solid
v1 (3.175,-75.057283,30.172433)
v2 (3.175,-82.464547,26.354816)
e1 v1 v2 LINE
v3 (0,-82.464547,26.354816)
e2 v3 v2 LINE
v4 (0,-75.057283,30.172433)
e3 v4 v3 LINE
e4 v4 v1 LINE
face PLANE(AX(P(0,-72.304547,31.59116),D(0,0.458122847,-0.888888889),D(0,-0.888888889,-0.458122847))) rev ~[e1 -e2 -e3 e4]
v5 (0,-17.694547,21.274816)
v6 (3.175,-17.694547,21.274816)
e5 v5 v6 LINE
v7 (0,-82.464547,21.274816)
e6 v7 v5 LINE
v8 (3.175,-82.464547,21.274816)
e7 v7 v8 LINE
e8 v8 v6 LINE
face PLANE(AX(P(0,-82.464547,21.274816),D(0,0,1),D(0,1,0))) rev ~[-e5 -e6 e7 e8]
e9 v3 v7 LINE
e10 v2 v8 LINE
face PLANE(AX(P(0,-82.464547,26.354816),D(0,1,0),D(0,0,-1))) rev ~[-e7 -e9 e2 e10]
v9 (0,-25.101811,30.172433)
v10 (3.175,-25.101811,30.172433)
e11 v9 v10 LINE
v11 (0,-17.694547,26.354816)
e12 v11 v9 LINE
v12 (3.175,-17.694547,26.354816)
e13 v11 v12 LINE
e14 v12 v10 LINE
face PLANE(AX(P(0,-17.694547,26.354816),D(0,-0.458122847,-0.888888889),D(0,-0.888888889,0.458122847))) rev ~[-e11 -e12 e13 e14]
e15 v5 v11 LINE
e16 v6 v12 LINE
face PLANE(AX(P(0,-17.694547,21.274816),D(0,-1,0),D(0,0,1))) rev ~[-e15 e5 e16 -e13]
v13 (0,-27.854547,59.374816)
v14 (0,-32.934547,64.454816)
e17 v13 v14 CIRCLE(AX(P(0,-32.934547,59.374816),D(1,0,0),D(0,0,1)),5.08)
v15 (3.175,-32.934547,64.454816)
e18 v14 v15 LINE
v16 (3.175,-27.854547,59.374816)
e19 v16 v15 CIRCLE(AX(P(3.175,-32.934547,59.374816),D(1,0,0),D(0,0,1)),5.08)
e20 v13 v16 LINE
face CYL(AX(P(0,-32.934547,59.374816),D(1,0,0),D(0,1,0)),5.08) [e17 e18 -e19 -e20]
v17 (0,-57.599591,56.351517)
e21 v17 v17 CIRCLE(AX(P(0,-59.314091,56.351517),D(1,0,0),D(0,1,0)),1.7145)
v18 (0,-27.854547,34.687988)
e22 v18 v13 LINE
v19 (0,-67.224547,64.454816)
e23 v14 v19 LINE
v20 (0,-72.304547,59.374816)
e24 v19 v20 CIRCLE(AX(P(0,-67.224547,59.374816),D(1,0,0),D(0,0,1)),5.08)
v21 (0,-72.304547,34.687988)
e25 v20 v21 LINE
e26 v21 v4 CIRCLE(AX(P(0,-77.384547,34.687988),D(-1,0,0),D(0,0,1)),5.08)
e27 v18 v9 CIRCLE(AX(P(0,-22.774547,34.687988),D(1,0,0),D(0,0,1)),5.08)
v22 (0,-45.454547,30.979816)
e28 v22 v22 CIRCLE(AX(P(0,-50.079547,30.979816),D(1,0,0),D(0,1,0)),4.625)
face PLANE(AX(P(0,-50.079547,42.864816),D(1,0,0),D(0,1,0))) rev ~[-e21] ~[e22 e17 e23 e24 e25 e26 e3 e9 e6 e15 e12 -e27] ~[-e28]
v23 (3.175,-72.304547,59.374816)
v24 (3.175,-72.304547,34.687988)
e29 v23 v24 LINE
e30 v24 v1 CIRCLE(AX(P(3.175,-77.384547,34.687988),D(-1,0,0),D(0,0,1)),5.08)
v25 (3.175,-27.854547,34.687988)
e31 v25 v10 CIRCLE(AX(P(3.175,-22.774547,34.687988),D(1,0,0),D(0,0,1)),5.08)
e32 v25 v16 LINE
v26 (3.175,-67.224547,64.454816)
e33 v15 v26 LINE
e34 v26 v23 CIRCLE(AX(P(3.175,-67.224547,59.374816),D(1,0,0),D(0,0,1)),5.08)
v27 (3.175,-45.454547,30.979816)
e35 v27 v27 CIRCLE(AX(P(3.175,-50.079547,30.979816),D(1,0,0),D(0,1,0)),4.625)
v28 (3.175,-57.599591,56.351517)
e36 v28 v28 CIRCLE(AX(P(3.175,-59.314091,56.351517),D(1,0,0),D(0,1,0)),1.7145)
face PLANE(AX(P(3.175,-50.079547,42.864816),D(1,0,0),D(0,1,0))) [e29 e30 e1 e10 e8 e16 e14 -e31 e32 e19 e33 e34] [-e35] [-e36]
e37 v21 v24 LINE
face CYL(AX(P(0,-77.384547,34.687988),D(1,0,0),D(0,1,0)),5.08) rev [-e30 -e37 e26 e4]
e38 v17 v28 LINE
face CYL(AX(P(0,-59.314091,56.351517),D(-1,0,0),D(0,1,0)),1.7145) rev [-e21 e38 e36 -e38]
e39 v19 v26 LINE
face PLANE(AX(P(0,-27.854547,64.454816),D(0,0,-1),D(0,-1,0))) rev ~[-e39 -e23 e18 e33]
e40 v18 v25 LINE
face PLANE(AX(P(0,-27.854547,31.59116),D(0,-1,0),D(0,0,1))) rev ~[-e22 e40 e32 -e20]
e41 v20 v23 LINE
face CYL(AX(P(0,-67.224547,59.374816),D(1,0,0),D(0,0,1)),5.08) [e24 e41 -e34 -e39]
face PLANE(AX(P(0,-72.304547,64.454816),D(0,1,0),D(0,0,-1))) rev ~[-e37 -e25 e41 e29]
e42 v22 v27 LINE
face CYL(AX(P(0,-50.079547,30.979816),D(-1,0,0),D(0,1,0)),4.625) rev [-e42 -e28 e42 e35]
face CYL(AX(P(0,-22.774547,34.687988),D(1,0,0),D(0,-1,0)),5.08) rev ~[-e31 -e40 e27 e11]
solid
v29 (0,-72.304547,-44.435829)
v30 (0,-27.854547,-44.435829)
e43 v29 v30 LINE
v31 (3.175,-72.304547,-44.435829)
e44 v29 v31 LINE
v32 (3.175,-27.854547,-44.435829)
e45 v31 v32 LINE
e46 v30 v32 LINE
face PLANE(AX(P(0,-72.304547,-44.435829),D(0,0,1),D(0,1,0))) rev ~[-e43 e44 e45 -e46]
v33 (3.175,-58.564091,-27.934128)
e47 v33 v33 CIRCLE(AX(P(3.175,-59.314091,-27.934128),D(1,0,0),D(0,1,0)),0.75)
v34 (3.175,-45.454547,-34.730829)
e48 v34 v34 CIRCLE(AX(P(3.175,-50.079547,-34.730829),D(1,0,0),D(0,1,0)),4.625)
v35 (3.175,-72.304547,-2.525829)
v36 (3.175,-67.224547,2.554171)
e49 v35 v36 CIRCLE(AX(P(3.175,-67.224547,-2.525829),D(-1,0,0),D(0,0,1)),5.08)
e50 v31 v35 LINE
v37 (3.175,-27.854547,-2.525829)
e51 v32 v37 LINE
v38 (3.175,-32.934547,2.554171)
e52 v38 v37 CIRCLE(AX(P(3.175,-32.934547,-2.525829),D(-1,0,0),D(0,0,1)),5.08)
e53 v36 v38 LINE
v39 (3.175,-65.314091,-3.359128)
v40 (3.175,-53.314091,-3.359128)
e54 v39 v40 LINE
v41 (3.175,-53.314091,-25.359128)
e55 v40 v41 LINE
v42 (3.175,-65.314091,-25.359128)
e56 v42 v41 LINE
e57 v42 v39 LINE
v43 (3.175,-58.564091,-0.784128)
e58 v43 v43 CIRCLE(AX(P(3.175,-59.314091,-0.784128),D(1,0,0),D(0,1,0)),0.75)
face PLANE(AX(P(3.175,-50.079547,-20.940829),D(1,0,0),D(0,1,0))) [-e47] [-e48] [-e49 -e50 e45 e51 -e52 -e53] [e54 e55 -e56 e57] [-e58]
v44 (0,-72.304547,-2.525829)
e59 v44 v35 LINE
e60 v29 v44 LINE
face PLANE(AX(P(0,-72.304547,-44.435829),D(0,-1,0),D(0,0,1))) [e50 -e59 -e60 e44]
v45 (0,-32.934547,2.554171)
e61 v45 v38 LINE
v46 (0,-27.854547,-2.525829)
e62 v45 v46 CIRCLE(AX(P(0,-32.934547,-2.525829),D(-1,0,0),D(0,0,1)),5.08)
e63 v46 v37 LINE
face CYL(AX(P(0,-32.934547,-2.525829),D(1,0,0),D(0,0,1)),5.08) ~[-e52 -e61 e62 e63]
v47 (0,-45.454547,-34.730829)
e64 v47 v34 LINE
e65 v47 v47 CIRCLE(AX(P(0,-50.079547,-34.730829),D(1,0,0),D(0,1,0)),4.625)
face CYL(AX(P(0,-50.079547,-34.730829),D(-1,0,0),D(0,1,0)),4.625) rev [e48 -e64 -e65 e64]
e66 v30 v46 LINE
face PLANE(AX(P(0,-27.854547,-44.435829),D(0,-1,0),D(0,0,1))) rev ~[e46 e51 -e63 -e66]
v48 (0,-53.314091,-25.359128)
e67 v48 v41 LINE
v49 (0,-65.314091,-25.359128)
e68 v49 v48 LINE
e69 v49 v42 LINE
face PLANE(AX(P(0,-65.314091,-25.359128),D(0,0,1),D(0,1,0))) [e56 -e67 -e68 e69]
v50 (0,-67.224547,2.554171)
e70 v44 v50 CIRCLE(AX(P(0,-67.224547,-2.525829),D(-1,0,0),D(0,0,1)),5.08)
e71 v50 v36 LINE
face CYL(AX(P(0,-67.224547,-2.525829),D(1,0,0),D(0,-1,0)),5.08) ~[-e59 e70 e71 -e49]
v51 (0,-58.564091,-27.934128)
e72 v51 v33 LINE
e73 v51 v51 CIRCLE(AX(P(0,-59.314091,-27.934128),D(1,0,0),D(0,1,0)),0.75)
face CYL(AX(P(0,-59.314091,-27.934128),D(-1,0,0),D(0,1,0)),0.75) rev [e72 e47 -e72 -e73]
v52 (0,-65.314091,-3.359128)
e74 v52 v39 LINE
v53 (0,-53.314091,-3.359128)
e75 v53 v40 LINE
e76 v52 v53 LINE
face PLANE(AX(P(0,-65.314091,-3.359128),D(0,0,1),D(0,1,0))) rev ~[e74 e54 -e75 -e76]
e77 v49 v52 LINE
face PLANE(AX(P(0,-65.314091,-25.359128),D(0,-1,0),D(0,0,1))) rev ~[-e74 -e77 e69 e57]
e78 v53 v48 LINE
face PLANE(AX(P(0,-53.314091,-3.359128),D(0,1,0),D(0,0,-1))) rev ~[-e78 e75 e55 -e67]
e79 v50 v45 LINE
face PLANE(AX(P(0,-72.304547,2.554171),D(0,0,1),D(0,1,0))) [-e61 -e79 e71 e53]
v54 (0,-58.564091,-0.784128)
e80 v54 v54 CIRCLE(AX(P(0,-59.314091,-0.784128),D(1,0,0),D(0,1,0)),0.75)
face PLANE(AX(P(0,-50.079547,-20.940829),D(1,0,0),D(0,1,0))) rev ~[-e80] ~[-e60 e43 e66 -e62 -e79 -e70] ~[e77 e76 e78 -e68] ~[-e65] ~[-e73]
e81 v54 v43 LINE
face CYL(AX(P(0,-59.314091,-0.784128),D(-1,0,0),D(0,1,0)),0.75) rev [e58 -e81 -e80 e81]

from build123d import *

# Parameters (mm, degrees)
F0_R     = 4.625
F0_R_2   = 1.7145
F1_DEPTH = 3.175
F0_W     = 44.45
F0_H     = 46.99
F0_R_3   = 0.75
F0_W_2   = 12
F0_H_2   = 5.15
F2_R     = 5.08
F2_2_R   = 5.08


# Not quite as in the source:
# - a feature names something its author has since deleted; it is built from what else it names


with BuildPart() as f1:
    # F0 (on Right) → F1 (new body)
    with BuildSketch(Plane.YZ):
        Polygon((-72.304546833, 31.5911603894), (-72.304546833, 21.2748162448), (-27.854546833, 21.2748162448), (-27.854546833, 31.5911603894), (-27.854546833, 64.4548162448), (-59.604546833, 64.4548162448), (-61.3806888302, 64.4548162448), (-72.304546833, 64.4548162448), align=None)
        with Locations((-50.079546833, 30.9798162448)):
            Circle(F0_R, mode=Mode.SUBTRACT)
        with Locations((-59.3140907028, 56.3515170061)):
            Circle(F0_R_2, mode=Mode.SUBTRACT)
        Polygon((-82.464546833, 21.2748162448), (-72.304546833, 21.2748162448), (-72.304546833, 31.5911603894), (-82.464546833, 26.3548162448), align=None)
        Polygon((-27.854546833, 31.5911603894), (-27.854546833, 21.2748162448), (-17.694546833, 21.2748162448), (-17.694546833, 26.3548162448), align=None)
    extrude(amount=F1_DEPTH)

    # F2
    f2_edges = [f1.edges().sort_by_distance(p)[0] for p in [
        (1.5875, -27.854547, 64.454816),
        (1.5875, -72.304547, 64.454816),
        (1.5875, -27.854547, 31.59116),
        (1.5875, -72.304547, 31.59116),
    ]]
    fillet(f2_edges, radius=F2_R)


with BuildPart() as f1b:
    # F0 (on Right) → F1, piece 2 (new body)
    with BuildSketch(Plane.YZ):
        with Locations((-50.079546833, -20.9408289242)):
            Rectangle(F0_W, F0_H)
        Polygon((-53.3140907028, -9.359128163), (-53.3140907028, -25.359128163), (-53.3140907028, -30.509128163), (-65.3140907028, -30.509128163), (-65.3140907028, -25.359128163), (-65.3140907028, -9.359128163), (-65.3140907028, -3.359128163), (-65.3140907028, 1.790871837), (-53.3140907028, 1.790871837), (-53.3140907028, -3.359128163), align=None, mode=Mode.SUBTRACT)
        with Locations((-50.079546833, -34.7308289242)):
            Circle(F0_R, mode=Mode.SUBTRACT)
        Polygon((-59.3140907028, -3.359128163), (-53.3140907028, -3.359128163), (-53.3140907028, 1.790871837), (-65.3140907028, 1.790871837), (-65.3140907028, -3.359128163), align=None)
        with Locations((-59.3140907028, -0.784128163)):
            Circle(F0_R_3, mode=Mode.SUBTRACT)
        with Locations((-59.3140907028, -27.934128163)):
            Rectangle(F0_W_2, F0_H_2)
        with Locations((-59.3140907028, -27.934128163)):
            Circle(F0_R_3, mode=Mode.SUBTRACT)
    extrude(amount=F1_DEPTH)

    # F2#2
    f2_2_edges = [f1b.edges().sort_by_distance(p)[0] for p in [
        (1.5875, -72.304547, 2.554171),
        (1.5875, -27.854547, 2.554171),
    ]]
    fillet(f2_2_edges, radius=F2_2_R)


solid = Compound([f1.part, f1b.part])
